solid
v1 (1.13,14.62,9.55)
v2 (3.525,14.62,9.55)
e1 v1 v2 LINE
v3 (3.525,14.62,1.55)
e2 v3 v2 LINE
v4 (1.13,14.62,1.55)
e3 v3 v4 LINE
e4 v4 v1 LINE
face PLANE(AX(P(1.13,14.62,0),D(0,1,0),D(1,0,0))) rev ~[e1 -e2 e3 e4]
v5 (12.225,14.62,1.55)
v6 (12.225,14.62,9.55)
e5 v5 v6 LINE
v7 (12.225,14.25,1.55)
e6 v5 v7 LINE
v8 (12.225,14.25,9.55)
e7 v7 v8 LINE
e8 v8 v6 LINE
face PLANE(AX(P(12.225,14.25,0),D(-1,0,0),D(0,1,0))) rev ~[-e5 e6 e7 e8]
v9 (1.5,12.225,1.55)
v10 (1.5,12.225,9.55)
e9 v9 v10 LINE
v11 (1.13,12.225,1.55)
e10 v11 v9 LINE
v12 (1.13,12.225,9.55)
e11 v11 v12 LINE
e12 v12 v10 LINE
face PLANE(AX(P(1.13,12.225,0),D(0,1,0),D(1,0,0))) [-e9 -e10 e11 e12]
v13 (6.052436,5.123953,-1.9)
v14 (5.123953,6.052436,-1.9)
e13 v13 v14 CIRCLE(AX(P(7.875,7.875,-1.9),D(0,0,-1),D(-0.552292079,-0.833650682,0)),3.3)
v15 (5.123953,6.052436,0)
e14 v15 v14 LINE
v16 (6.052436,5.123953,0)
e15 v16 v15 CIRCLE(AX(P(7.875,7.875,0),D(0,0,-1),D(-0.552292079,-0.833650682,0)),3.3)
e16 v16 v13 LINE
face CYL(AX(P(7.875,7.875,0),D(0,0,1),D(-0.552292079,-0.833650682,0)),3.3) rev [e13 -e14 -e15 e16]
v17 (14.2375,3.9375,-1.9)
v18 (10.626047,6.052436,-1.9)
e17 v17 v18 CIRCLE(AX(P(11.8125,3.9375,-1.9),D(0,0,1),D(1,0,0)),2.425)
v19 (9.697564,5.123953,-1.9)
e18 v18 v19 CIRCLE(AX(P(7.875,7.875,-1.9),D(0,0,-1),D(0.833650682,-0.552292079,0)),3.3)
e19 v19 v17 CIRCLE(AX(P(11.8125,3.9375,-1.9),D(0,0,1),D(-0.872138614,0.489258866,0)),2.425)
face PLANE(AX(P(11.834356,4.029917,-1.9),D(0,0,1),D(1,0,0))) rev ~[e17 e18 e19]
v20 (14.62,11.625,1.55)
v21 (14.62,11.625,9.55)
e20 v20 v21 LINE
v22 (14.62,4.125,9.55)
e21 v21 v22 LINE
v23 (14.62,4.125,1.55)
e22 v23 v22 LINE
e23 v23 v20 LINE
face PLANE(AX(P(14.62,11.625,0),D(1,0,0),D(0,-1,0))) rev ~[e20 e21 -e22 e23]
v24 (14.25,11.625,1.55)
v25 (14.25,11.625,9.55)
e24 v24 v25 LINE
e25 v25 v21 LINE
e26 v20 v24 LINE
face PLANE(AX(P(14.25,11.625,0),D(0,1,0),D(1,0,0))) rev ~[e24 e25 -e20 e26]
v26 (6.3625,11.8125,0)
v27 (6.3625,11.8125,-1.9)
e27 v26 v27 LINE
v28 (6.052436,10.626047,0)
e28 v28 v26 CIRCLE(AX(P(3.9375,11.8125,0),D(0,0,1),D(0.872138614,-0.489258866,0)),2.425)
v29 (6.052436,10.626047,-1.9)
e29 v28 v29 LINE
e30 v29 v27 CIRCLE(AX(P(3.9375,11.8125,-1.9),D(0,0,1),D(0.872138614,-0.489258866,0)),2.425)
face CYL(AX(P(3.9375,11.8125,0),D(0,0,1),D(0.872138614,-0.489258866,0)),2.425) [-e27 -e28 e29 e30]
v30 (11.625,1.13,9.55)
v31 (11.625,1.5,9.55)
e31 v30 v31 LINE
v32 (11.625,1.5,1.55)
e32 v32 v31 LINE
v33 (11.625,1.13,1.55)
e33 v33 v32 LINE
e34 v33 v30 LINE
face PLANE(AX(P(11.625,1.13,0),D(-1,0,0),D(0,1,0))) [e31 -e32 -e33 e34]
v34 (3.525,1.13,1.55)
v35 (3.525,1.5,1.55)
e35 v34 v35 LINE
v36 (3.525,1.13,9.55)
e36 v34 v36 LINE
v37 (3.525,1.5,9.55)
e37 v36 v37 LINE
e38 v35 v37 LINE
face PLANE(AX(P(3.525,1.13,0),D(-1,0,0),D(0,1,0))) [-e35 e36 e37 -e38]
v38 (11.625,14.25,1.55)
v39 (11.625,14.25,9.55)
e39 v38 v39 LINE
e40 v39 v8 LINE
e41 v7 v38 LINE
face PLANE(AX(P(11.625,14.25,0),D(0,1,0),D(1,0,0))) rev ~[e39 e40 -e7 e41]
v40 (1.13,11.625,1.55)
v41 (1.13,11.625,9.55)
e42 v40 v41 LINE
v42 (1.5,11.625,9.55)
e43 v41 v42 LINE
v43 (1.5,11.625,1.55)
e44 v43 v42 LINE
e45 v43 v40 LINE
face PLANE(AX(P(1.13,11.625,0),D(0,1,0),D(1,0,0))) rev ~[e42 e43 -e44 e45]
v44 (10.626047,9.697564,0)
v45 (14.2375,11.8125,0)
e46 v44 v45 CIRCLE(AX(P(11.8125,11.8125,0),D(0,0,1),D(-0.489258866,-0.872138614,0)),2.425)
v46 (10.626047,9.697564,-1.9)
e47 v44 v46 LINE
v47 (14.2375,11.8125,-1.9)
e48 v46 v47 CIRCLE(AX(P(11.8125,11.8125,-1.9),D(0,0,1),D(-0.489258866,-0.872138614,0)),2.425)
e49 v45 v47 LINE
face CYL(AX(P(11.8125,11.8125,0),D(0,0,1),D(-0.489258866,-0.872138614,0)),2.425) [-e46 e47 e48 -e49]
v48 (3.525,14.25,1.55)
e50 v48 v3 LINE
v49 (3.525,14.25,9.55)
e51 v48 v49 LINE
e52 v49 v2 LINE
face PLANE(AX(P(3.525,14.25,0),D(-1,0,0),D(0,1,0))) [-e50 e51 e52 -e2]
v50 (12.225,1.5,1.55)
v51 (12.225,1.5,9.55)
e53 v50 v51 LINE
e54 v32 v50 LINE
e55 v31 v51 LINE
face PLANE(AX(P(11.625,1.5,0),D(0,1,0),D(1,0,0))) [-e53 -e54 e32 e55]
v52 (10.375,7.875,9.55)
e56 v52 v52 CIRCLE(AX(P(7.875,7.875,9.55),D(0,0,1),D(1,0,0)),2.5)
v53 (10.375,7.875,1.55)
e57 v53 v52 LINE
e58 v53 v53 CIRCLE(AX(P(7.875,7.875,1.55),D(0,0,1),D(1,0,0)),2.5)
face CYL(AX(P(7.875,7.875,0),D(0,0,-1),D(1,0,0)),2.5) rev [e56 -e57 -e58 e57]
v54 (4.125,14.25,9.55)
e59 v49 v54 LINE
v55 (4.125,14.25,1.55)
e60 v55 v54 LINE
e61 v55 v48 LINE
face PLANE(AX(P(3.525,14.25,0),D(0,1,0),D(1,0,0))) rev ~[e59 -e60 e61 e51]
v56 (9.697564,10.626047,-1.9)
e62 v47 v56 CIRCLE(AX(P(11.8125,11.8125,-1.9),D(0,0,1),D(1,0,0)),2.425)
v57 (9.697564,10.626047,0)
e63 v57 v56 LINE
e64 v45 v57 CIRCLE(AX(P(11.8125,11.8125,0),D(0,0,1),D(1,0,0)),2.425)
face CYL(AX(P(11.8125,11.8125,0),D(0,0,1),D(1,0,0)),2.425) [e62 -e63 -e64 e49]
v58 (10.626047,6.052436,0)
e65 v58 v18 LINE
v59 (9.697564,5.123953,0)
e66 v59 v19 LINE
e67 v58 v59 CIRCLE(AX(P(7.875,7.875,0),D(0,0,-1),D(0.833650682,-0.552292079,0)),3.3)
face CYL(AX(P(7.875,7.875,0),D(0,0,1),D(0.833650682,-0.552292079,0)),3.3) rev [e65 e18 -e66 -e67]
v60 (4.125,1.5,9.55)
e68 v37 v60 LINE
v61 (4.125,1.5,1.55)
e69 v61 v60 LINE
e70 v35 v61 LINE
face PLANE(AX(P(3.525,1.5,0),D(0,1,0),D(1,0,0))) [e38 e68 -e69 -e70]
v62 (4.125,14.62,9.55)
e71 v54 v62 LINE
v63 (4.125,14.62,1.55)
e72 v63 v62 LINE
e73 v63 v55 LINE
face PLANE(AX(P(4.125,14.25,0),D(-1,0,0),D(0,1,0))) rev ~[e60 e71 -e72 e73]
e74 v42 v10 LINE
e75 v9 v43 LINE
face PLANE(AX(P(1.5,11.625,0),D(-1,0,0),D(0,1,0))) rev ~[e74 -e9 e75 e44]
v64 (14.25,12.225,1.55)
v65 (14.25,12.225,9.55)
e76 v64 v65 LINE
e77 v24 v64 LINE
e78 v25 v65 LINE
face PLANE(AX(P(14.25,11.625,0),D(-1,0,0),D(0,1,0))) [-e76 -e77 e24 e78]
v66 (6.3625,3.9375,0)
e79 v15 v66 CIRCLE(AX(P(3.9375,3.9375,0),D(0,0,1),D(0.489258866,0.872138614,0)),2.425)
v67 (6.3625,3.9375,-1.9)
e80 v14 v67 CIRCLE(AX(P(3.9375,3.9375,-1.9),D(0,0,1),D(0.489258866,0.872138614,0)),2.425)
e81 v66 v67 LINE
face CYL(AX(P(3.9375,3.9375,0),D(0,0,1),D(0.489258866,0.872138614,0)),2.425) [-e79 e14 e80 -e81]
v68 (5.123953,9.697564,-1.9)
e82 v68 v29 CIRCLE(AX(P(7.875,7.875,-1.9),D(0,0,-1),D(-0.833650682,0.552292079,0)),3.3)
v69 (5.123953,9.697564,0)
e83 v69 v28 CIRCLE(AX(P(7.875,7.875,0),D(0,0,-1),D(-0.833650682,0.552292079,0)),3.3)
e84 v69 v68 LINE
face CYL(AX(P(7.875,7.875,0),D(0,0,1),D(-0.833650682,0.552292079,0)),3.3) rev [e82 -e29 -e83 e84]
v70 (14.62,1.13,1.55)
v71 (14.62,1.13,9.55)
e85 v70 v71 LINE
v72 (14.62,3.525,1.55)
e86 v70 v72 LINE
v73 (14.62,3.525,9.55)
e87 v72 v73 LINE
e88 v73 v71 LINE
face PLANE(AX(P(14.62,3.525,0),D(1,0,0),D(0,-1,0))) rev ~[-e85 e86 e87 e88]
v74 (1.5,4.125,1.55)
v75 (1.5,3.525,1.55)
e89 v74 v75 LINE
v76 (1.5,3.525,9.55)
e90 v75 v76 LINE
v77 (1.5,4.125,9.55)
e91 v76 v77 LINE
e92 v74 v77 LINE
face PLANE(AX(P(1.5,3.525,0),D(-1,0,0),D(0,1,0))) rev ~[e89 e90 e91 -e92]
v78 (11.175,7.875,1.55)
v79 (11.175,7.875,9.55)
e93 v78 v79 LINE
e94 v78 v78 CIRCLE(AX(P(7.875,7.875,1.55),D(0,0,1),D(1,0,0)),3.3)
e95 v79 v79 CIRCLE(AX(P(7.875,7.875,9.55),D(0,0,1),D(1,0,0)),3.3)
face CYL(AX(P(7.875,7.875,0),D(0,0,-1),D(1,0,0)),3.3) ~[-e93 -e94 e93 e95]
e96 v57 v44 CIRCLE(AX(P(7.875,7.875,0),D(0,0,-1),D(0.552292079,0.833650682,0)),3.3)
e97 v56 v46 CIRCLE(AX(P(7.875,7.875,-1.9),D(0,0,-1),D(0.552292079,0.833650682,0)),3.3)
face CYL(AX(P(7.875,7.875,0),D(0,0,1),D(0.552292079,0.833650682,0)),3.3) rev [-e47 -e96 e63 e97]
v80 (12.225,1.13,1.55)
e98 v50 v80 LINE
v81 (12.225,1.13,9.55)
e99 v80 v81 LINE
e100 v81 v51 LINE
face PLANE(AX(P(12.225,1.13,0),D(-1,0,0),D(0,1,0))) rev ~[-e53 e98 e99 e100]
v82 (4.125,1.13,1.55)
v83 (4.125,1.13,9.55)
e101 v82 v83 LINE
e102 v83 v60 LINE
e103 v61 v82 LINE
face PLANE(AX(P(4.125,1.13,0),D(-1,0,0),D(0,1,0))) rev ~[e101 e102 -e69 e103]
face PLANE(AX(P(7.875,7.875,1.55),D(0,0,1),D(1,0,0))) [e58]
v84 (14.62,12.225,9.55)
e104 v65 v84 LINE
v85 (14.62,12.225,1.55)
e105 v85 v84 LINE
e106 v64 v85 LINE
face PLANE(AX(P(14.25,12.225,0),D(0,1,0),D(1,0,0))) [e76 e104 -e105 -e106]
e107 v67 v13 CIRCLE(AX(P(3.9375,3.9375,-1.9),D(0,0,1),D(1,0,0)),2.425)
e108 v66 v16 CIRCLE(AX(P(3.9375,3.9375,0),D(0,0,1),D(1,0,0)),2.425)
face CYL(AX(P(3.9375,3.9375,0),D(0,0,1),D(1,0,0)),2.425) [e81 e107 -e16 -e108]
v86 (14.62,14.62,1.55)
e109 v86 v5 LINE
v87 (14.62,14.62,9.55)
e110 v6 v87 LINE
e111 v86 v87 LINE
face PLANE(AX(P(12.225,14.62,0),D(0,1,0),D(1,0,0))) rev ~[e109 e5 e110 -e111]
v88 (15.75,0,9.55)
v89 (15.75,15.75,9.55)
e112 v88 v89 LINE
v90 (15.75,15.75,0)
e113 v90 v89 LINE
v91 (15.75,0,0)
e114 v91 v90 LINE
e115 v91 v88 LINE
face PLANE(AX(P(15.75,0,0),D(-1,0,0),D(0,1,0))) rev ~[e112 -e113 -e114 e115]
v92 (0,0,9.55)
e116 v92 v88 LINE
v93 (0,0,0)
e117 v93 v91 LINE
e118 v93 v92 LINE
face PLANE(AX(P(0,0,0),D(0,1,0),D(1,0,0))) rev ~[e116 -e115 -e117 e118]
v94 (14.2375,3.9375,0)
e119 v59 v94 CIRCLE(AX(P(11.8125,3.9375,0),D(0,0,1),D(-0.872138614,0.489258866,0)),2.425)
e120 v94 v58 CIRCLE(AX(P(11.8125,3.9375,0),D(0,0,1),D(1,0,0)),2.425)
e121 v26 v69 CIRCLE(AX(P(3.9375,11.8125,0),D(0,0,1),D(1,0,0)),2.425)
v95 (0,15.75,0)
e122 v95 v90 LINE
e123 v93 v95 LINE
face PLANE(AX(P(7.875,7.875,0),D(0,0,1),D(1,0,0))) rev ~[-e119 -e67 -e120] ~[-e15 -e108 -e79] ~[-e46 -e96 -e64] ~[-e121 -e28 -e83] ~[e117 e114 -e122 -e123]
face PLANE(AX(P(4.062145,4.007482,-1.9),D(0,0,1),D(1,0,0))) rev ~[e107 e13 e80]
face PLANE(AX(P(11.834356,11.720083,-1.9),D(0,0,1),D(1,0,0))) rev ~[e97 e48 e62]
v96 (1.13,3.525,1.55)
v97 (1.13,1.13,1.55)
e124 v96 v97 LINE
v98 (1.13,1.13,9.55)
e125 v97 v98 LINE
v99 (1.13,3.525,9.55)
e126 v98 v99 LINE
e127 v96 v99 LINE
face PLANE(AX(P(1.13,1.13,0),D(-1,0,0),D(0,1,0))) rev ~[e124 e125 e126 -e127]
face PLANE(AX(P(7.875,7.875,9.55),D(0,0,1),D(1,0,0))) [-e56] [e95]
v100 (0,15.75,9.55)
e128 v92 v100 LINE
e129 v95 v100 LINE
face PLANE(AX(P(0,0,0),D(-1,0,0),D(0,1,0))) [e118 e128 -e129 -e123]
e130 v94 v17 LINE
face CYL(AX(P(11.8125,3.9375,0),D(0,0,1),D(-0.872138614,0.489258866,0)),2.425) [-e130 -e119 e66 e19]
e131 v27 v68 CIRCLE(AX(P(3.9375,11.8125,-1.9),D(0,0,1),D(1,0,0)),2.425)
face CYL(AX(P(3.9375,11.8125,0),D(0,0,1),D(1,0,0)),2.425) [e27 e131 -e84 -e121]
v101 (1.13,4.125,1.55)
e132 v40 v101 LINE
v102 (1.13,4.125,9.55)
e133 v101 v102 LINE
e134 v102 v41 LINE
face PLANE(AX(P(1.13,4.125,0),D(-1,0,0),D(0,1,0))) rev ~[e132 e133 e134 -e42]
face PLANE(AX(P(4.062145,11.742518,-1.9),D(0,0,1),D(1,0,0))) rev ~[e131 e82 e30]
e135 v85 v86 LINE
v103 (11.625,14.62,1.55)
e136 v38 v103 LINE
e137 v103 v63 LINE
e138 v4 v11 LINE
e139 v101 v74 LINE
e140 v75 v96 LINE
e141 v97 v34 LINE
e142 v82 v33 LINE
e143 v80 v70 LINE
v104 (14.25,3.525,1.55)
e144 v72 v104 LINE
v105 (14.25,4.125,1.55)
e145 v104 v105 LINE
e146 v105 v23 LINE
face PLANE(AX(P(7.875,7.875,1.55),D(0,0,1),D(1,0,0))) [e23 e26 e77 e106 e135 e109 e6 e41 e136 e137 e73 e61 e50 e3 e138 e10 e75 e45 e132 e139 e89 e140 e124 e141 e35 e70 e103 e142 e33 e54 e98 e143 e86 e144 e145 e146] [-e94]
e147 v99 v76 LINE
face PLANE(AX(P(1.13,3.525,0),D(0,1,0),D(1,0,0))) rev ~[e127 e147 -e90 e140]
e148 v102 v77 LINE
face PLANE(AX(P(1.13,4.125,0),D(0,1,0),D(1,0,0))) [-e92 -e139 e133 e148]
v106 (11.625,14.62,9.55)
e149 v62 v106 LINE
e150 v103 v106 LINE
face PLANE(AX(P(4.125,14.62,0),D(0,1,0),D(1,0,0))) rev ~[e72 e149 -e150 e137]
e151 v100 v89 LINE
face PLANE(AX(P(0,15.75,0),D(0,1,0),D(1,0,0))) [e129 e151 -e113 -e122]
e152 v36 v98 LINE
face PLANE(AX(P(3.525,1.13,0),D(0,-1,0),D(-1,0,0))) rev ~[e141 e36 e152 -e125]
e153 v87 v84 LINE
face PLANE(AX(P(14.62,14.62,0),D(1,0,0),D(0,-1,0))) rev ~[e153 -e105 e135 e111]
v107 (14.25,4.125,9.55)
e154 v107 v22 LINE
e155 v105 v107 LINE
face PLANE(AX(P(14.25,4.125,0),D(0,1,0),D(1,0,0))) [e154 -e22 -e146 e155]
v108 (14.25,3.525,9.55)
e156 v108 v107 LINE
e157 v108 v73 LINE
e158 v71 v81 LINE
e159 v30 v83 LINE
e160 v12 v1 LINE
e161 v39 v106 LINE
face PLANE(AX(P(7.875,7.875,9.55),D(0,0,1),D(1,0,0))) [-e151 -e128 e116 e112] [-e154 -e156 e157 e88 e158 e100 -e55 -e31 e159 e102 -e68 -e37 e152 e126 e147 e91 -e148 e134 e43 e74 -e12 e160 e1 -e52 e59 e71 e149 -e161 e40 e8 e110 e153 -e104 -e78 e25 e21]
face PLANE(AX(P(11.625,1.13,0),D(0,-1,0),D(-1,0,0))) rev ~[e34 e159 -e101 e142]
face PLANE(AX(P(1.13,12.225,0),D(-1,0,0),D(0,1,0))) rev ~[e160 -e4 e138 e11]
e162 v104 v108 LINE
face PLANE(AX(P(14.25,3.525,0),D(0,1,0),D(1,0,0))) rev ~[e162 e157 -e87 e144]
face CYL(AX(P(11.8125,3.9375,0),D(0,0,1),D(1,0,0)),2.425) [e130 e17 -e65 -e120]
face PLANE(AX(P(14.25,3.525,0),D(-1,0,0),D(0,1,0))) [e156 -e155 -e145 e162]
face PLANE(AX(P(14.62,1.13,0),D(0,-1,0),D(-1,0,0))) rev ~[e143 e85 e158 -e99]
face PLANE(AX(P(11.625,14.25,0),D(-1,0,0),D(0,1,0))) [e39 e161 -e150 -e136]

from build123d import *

# Parameters (mm, degrees)
F0_W     = 15.75
F0_H     = 15.75
F0_W_2   = 0.6
F0_H_2   = 0.37
F0_W_3   = 0.37
F0_H_3   = 0.6
F1_DEPTH = 9.55
F0_R     = 3.3
F0_R_2   = 2.5
F2_DEPTH = 1.55
F4_DEPTH = 1.9


with BuildPart() as f1:
    # F0 (on Top) → F1 (new body)
    with BuildSketch(Plane.XY):
        with Locations((7.875, 7.875)):
            Rectangle(F0_W, F0_H)
        Polygon((1.13, 12.225), (1.13, 14.62), (3.525, 14.62), (4.125, 14.62), (11.625, 14.62), (12.225, 14.62), (14.62, 14.62), (14.62, 12.225), (14.62, 11.625), (14.62, 4.125), (14.62, 3.525), (14.62, 1.13), (12.225, 1.13), (11.625, 1.13), (4.125, 1.13), (3.525, 1.13), (1.13, 1.13), (1.13, 3.525), (1.13, 4.125), (1.13, 11.625), align=None, mode=Mode.SUBTRACT)
        with Locations((3.825, 14.435)):
            Rectangle(F0_W_2, F0_H_2)
        with Locations((1.315, 11.925)):
            Rectangle(F0_W_3, F0_H_3)
        with Locations((1.315, 3.825)):
            Rectangle(F0_W_3, F0_H_3)
        with Locations((3.825, 1.315)):
            Rectangle(F0_W_2, F0_H_2)
        with Locations((11.925, 1.315)):
            Rectangle(F0_W_2, F0_H_2)
        with Locations((14.435, 3.825)):
            Rectangle(F0_W_3, F0_H_3)
        with Locations((14.435, 11.925)):
            Rectangle(F0_W_3, F0_H_3)
        with Locations((11.925, 14.435)):
            Rectangle(F0_W_2, F0_H_2)
    extrude(amount=F1_DEPTH)



with BuildPart() as f1b:
    # F0 (on Top) → F1, piece 2 (new body)
    with BuildSketch(Plane.XY):
        with Locations((7.875, 7.875)):
            Circle(F0_R)
        with Locations((7.875, 7.875)):
            Circle(F0_R_2, mode=Mode.SUBTRACT)
    extrude(amount=F1_DEPTH)


with BuildPart() as f1_1:
    add(f1.part)

    add(f1b.part)  # F2 merges F1b
    # F0 (on Top) → F2 (join)
    with BuildSketch(Plane.XY):
        Polygon((3.525, 14.62), (1.13, 14.62), (1.13, 12.225), (1.5, 12.225), (1.5, 11.625), (1.13, 11.625), (1.13, 4.125), (1.5, 4.125), (1.5, 3.525), (1.13, 3.525), (1.13, 1.13), (3.525, 1.13), (3.525, 1.5), (4.125, 1.5), (4.125, 1.13), (11.625, 1.13), (11.625, 1.5), (12.225, 1.5), (12.225, 1.13), (14.62, 1.13), (14.62, 3.525), (14.25, 3.525), (14.25, 4.125), (14.62, 4.125), (14.62, 11.625), (14.25, 11.625), (14.25, 12.225), (14.62, 12.225), (14.62, 14.62), (12.225, 14.62), (12.225, 14.25), (11.625, 14.25), (11.625, 14.62), (4.125, 14.62), (4.125, 14.25), (3.525, 14.25), align=None)
        with Locations((7.875, 7.875)):
            Circle(F0_R, mode=Mode.SUBTRACT)
        with Locations((7.875, 7.875)):
            Circle(F0_R_2)
    extrude(amount=F2_DEPTH)

    # F3 (on face) → F4 (join)
    with BuildSketch(Plane.XY):
        with BuildLine():
            ThreePointArc((5.1239527498, 6.0524361391), (1.8449210985, 2.7120455778), (6.3625, 3.9375))
            ThreePointArc((6.3625, 3.9375), (6.2837038634, 4.5506495995), (6.0524361391, 5.1239527498))
            ThreePointArc((6.0524361391, 5.1239527498), (5.5415476221, 5.5415476221), (5.1239527498, 6.0524361391))
        make_face()
        with BuildLine():
            ThreePointArc((10.6260472502, 6.0524361391), (10.2084523779, 5.5415476221), (9.6975638609, 5.1239527498))
            ThreePointArc((9.6975638609, 5.1239527498), (11.1993504005, 1.5912961366), (14.2375, 3.9375))
            ThreePointArc((14.2375, 3.9375), (13.0379544222, 6.0300789015), (10.6260472502, 6.0524361391))
        make_face()
        with BuildLine():
            ThreePointArc((6.3625, 11.8125), (1.8449210985, 13.0379544222), (5.1239527498, 9.6975638609))
            ThreePointArc((5.1239527498, 9.6975638609), (5.5415476221, 10.2084523779), (6.0524361391, 10.6260472502))
            ThreePointArc((6.0524361391, 10.6260472502), (6.2837038634, 11.1993504005), (6.3625, 11.8125))
        make_face()
        with BuildLine():
            ThreePointArc((14.2375, 11.8125), (11.1993504005, 14.1587038634), (9.6975638609, 10.6260472502))
            ThreePointArc((9.6975638609, 10.6260472502), (10.2084523779, 10.2084523779), (10.6260472502, 9.6975638609))
            ThreePointArc((10.6260472502, 9.6975638609), (13.0379544222, 9.7199210985), (14.2375, 11.8125))
        make_face()
    extrude(amount=-F4_DEPTH)


solid = f1_1.part
